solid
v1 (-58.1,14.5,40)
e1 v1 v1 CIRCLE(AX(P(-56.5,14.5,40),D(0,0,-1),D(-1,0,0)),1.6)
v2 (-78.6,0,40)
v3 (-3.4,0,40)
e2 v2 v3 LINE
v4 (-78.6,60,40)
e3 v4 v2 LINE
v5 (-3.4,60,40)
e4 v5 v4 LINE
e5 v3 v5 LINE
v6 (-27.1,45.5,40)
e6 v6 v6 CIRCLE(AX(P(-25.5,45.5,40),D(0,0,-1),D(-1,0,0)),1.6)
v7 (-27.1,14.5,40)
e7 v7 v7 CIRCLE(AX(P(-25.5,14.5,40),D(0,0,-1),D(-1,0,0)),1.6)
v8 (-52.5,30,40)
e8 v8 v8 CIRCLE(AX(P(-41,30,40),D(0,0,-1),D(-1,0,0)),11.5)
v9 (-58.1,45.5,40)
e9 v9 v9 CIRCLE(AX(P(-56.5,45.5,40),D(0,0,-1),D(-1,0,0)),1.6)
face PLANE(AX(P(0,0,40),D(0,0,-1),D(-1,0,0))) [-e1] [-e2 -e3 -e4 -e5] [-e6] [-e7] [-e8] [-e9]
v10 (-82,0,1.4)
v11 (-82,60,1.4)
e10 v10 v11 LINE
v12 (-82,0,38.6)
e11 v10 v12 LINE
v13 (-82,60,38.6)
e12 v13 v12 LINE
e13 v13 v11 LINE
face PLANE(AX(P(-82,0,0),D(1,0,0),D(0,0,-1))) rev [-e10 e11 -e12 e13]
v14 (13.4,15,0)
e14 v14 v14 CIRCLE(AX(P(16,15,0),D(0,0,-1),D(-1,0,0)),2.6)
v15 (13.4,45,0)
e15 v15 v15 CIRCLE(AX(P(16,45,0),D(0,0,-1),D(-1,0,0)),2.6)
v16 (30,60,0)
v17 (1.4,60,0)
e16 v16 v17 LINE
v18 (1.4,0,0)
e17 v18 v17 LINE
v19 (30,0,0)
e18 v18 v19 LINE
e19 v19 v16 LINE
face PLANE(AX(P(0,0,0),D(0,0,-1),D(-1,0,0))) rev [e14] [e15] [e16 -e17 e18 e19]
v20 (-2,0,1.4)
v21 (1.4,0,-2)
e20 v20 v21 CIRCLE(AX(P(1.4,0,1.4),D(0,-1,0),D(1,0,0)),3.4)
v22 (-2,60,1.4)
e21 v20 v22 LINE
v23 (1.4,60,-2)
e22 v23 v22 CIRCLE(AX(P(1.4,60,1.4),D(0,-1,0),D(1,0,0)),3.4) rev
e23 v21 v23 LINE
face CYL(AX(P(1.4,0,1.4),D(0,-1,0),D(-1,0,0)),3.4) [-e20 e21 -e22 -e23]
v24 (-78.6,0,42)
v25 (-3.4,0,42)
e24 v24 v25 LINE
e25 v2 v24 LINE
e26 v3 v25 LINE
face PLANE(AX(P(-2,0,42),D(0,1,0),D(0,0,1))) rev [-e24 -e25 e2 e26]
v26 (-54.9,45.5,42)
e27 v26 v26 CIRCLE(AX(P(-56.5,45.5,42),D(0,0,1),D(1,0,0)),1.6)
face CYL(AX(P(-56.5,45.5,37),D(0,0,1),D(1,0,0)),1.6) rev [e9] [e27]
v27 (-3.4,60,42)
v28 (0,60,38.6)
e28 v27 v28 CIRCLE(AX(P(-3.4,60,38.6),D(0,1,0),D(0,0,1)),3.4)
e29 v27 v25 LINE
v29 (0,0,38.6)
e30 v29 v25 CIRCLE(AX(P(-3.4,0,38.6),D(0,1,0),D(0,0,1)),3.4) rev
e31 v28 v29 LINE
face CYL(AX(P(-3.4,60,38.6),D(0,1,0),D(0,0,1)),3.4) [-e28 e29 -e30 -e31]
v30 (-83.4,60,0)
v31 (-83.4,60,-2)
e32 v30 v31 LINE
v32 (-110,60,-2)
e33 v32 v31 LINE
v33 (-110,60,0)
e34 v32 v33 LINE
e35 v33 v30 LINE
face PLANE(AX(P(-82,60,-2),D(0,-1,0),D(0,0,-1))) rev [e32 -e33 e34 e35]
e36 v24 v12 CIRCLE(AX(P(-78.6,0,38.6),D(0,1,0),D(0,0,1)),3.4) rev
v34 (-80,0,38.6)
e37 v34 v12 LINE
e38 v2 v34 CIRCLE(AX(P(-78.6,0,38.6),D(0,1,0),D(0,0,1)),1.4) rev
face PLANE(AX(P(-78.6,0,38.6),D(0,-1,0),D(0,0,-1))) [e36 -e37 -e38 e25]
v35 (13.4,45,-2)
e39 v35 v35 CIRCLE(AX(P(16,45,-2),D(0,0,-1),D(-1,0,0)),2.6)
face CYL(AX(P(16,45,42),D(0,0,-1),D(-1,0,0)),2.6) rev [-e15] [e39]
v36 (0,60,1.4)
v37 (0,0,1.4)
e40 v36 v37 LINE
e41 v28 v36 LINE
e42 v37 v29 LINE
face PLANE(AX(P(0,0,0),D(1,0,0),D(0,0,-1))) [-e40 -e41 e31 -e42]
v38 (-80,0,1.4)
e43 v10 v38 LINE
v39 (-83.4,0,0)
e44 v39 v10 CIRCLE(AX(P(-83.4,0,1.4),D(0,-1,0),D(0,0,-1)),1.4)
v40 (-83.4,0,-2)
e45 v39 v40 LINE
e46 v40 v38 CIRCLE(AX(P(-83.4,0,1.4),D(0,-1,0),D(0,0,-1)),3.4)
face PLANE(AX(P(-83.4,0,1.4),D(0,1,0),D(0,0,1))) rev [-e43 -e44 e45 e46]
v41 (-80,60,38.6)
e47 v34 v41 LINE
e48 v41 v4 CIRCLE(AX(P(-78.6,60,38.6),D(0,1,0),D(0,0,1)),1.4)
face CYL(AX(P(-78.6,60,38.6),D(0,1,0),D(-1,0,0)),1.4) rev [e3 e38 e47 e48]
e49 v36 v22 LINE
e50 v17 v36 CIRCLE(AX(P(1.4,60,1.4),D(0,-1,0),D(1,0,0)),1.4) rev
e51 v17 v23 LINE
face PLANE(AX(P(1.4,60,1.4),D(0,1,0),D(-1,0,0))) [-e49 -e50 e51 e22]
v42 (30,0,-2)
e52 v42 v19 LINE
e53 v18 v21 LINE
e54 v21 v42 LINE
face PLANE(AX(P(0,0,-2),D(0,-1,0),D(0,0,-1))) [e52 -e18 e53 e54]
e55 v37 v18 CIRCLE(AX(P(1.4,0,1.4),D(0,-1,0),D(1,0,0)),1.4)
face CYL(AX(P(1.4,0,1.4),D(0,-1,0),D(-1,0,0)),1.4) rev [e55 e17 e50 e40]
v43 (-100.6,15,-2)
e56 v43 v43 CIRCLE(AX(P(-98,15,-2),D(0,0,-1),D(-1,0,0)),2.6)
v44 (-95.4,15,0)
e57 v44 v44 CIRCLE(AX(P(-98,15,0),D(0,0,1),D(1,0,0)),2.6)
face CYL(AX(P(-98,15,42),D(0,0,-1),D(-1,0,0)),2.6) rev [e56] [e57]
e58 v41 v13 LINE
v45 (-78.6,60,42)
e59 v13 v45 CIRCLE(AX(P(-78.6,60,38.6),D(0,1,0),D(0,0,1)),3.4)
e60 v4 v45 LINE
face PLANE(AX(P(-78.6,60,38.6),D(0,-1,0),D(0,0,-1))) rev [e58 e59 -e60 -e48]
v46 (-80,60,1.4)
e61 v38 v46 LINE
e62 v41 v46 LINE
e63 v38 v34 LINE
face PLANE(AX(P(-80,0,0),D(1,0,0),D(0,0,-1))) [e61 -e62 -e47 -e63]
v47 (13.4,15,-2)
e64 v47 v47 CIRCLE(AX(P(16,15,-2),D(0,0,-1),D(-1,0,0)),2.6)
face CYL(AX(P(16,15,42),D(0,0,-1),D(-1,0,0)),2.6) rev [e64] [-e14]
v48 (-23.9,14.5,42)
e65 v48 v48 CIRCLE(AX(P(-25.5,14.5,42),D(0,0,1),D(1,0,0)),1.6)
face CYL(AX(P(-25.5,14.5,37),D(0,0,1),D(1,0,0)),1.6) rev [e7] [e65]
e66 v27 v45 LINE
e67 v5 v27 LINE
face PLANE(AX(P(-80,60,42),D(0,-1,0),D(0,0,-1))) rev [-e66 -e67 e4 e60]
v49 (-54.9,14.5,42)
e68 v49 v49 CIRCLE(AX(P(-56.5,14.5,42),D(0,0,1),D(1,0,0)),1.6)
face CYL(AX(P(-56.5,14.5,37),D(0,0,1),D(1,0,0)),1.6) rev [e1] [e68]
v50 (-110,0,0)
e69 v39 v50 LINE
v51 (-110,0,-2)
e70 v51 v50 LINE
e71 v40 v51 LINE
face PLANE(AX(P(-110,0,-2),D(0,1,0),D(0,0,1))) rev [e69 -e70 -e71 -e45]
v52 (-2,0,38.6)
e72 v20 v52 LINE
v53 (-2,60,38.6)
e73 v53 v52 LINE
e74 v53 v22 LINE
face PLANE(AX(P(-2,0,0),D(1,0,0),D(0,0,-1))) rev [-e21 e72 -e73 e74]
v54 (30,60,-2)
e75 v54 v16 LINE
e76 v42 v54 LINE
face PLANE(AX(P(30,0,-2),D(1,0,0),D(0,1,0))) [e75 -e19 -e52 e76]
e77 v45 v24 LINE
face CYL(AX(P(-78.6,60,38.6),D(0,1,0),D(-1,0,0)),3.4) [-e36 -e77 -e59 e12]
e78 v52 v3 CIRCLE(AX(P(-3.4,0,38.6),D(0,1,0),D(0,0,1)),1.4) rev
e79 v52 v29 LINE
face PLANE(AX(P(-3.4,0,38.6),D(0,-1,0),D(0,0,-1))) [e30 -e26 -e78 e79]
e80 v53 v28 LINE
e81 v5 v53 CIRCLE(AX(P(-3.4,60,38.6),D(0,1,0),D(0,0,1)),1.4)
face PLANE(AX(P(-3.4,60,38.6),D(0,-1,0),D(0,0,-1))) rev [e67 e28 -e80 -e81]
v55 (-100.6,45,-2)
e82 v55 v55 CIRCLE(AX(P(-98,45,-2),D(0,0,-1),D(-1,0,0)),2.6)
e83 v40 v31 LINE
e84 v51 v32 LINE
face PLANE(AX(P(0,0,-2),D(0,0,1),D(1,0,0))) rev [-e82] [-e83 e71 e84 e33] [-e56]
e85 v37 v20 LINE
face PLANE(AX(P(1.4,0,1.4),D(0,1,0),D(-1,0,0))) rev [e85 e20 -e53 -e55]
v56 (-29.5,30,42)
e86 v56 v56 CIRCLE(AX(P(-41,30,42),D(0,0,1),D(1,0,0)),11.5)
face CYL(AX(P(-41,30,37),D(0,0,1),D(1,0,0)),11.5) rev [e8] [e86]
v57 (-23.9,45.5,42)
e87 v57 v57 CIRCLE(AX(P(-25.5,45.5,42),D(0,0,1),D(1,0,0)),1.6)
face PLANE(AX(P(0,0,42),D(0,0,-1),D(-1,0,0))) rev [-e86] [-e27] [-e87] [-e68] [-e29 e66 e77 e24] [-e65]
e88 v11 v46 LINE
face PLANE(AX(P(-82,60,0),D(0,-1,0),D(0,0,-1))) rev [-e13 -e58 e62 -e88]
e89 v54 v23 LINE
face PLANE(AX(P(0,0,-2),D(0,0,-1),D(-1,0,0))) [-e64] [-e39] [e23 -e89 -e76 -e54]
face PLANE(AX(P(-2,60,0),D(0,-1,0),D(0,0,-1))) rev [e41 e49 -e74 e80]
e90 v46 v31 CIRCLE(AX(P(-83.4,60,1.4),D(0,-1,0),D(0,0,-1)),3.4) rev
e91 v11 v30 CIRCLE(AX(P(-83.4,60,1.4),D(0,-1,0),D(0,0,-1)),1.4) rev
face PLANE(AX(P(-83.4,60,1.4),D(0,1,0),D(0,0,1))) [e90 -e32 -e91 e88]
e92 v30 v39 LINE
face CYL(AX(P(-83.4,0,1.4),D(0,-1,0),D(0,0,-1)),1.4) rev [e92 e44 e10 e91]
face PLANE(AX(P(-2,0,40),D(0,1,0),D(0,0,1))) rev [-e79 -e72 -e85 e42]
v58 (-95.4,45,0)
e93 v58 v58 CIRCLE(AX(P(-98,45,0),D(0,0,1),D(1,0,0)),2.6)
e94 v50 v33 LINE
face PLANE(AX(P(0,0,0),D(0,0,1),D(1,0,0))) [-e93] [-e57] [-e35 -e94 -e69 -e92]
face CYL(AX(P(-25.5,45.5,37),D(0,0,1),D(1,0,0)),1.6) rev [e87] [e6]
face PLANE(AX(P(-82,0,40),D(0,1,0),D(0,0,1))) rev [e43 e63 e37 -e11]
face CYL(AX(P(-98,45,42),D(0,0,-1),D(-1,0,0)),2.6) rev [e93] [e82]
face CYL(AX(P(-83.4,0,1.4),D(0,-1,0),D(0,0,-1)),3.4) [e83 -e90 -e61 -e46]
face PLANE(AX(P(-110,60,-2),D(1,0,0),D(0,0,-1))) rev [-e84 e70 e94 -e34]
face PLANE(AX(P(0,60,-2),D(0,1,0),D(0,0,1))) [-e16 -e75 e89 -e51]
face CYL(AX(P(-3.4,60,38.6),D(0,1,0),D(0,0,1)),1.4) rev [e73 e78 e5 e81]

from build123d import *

# Parameters (mm, degrees)
SKETCH1_W                    = 30
SKETCH1_H                    = 60
BASE_FLANGE1_DEPTH           = 2
EDGE_FLANGE1_STRIP_W         = 12.8
EDGE_FLANGE1_STRIP_H         = 2
EDGE_FLANGE1_STRIP_CUT_DEPTH = 60
EDGE_FLANGE1_DEPTH           = 60
EDGE_FLANGE2_STRIP_W         = 12.8
EDGE_FLANGE2_STRIP_H         = 2
EDGE_FLANGE2_STRIP_CUT_DEPTH = 60
EDGE_FLANGE2_DEPTH           = 60
EDGE_FLANGE3_STRIP_W         = 12.8
EDGE_FLANGE3_STRIP_H         = 2
EDGE_FLANGE3_STRIP_CUT_DEPTH = 60
EDGE_FLANGE3_DEPTH           = 60
EDGE_FLANGE4_STRIP_W         = 12.8
EDGE_FLANGE4_STRIP_H         = 2
EDGE_FLANGE4_STRIP_CUT_DEPTH = 60
EDGE_FLANGE4_DEPTH           = 60
SKETCH22_R                   = 2.6
CUT_EXTRUDE1_DEPTH           = 133.800602408
SKETCH23_R                   = 11.5
SKETCH23_R_2                 = 1.6
CUT_EXTRUDE2_DEPTH           = 5


# Sheet-metal steps are written as plain solids
with BuildPart() as part:
    # Sketch1 → Base-Flange1 (new body)
    with BuildSketch(Plane.XY):
        with Locations((15, 30)):
            Rectangle(SKETCH1_W, SKETCH1_H)
    extrude(amount=-BASE_FLANGE1_DEPTH)

    # Edge-Flange1 strip (across the edge) → Edge-Flange1 strip cut (cut)
    with BuildSketch(Plane(origin=(-2, 60, 0), x_dir=(1, 0, 0), z_dir=(0, -1, 0))):
        with Locations((-3, -1)):
            Rectangle(EDGE_FLANGE1_STRIP_W, EDGE_FLANGE1_STRIP_H)
    extrude(amount=EDGE_FLANGE1_STRIP_CUT_DEPTH, mode=Mode.SUBTRACT)

    # Edge-Flange1 section (across the edge) → Edge-Flange1 (add)
    with BuildSketch(Plane(origin=(-2, 60, 0), x_dir=(1, 0, 0), z_dir=(0, -1, 0))):
        with BuildLine():
            Line((0, 1.4), (0, 40))
            Line((0, 40), (2, 40))
            Line((2, 40), (2, 1.4))
            ThreePointArc((2, 1.4), (2.410050506, 0.410050506), (3.4, 0))
            Line((3.4, 0), (3.4, -2))
            ThreePointArc((3.4, -2), (0.995836944, -1.004163056), (0, 1.4))
        make_face()
    extrude(amount=EDGE_FLANGE1_DEPTH)

    # Edge-Flange2 strip (across the edge) → Edge-Flange2 strip cut (cut)
    with BuildSketch(Plane(origin=(-2, 0, 42), x_dir=(0, 0, -1), z_dir=(0, 1, 0))):
        with Locations((-3, -1)):
            Rectangle(EDGE_FLANGE2_STRIP_W, EDGE_FLANGE2_STRIP_H)
    extrude(amount=EDGE_FLANGE2_STRIP_CUT_DEPTH, mode=Mode.SUBTRACT)

    # Edge-Flange2 section (across the edge) → Edge-Flange2 (add)
    with BuildSketch(Plane(origin=(-2, 0, 42), x_dir=(0, 0, -1), z_dir=(0, 1, 0))):
        with BuildLine():
            Line((0, 1.4), (0, 78))
            Line((0, 78), (2, 78))
            Line((2, 78), (2, 1.4))
            ThreePointArc((2, 1.4), (2.410050506, 0.410050506), (3.4, 0))
            Line((3.4, 0), (3.4, -2))
            ThreePointArc((3.4, -2), (0.995836944, -1.004163056), (0, 1.4))
        make_face()
    extrude(amount=EDGE_FLANGE2_DEPTH)

    # Edge-Flange3 strip (across the edge) → Edge-Flange3 strip cut (cut)
    with BuildSketch(Plane(origin=(-82, 0, 40), x_dir=(1, 0, 0), z_dir=(0, 1, 0))):
        with Locations((-3, -1)):
            Rectangle(EDGE_FLANGE3_STRIP_W, EDGE_FLANGE3_STRIP_H)
    extrude(amount=EDGE_FLANGE3_STRIP_CUT_DEPTH, mode=Mode.SUBTRACT)

    # Edge-Flange3 section (across the edge) → Edge-Flange3 (add)
    with BuildSketch(Plane(origin=(-82, 0, 40), x_dir=(1, 0, 0), z_dir=(0, 1, 0))):
        with BuildLine():
            Line((0, 1.4), (0, 40))
            Line((0, 40), (2, 40))
            Line((2, 40), (2, 1.4))
            ThreePointArc((2, 1.4), (2.410050506, 0.410050506), (3.4, 0))
            Line((3.4, 0), (3.4, -2))
            ThreePointArc((3.4, -2), (0.995836944, -1.004163056), (0, 1.4))
        make_face()
    extrude(amount=EDGE_FLANGE3_DEPTH)

    # Edge-Flange4 strip (across the edge) → Edge-Flange4 strip cut (cut)
    with BuildSketch(Plane(origin=(-82, 60, -2), x_dir=(0, 0, 1), z_dir=(0, -1, 0))):
        with Locations((-3, -1)):
            Rectangle(EDGE_FLANGE4_STRIP_W, EDGE_FLANGE4_STRIP_H)
    extrude(amount=EDGE_FLANGE4_STRIP_CUT_DEPTH, mode=Mode.SUBTRACT)

    # Edge-Flange4 section (across the edge) → Edge-Flange4 (add)
    with BuildSketch(Plane(origin=(-82, 60, -2), x_dir=(0, 0, 1), z_dir=(0, -1, 0))):
        with BuildLine():
            Line((0, 1.4), (0, 28))
            Line((0, 28), (2, 28))
            Line((2, 28), (2, 1.4))
            ThreePointArc((2, 1.4), (2.410050506, 0.410050506), (3.4, 0))
            Line((3.4, 0), (3.4, -2))
            ThreePointArc((3.4, -2), (0.995836944, -1.004163056), (0, 1.4))
        make_face()
    extrude(amount=EDGE_FLANGE4_DEPTH)

    # Sketch22 → Cut-Extrude1 (cut, through all)
    with BuildSketch(Plane(origin=(0, 0, -2), x_dir=(-1, 0, 0), z_dir=(0, 0, -1))):
        with Locations((-16, 45)):
            Circle(SKETCH22_R)
        with Locations((-16, 15)):
            Circle(SKETCH22_R)
        with Locations((98, 45)):
            Circle(SKETCH22_R)
        with Locations((98, 15)):
            Circle(SKETCH22_R)
    extrude(amount=-CUT_EXTRUDE1_DEPTH, mode=Mode.SUBTRACT)

    # Sketch23 → Cut-Extrude2 (cut)
    with BuildSketch(Plane.XY.offset(42)):
        with Locations((-41, 30)):
            Circle(SKETCH23_R)
        with Locations((-25.5, 45.5)):
            Circle(SKETCH23_R_2)
        with Locations((-25.5, 14.5)):
            Circle(SKETCH23_R_2)
        with Locations((-56.5, 14.5)):
            Circle(SKETCH23_R_2)
        with Locations((-56.5, 45.5)):
            Circle(SKETCH23_R_2)
    extrude(amount=-CUT_EXTRUDE2_DEPTH, mode=Mode.SUBTRACT)


solid = part.part
